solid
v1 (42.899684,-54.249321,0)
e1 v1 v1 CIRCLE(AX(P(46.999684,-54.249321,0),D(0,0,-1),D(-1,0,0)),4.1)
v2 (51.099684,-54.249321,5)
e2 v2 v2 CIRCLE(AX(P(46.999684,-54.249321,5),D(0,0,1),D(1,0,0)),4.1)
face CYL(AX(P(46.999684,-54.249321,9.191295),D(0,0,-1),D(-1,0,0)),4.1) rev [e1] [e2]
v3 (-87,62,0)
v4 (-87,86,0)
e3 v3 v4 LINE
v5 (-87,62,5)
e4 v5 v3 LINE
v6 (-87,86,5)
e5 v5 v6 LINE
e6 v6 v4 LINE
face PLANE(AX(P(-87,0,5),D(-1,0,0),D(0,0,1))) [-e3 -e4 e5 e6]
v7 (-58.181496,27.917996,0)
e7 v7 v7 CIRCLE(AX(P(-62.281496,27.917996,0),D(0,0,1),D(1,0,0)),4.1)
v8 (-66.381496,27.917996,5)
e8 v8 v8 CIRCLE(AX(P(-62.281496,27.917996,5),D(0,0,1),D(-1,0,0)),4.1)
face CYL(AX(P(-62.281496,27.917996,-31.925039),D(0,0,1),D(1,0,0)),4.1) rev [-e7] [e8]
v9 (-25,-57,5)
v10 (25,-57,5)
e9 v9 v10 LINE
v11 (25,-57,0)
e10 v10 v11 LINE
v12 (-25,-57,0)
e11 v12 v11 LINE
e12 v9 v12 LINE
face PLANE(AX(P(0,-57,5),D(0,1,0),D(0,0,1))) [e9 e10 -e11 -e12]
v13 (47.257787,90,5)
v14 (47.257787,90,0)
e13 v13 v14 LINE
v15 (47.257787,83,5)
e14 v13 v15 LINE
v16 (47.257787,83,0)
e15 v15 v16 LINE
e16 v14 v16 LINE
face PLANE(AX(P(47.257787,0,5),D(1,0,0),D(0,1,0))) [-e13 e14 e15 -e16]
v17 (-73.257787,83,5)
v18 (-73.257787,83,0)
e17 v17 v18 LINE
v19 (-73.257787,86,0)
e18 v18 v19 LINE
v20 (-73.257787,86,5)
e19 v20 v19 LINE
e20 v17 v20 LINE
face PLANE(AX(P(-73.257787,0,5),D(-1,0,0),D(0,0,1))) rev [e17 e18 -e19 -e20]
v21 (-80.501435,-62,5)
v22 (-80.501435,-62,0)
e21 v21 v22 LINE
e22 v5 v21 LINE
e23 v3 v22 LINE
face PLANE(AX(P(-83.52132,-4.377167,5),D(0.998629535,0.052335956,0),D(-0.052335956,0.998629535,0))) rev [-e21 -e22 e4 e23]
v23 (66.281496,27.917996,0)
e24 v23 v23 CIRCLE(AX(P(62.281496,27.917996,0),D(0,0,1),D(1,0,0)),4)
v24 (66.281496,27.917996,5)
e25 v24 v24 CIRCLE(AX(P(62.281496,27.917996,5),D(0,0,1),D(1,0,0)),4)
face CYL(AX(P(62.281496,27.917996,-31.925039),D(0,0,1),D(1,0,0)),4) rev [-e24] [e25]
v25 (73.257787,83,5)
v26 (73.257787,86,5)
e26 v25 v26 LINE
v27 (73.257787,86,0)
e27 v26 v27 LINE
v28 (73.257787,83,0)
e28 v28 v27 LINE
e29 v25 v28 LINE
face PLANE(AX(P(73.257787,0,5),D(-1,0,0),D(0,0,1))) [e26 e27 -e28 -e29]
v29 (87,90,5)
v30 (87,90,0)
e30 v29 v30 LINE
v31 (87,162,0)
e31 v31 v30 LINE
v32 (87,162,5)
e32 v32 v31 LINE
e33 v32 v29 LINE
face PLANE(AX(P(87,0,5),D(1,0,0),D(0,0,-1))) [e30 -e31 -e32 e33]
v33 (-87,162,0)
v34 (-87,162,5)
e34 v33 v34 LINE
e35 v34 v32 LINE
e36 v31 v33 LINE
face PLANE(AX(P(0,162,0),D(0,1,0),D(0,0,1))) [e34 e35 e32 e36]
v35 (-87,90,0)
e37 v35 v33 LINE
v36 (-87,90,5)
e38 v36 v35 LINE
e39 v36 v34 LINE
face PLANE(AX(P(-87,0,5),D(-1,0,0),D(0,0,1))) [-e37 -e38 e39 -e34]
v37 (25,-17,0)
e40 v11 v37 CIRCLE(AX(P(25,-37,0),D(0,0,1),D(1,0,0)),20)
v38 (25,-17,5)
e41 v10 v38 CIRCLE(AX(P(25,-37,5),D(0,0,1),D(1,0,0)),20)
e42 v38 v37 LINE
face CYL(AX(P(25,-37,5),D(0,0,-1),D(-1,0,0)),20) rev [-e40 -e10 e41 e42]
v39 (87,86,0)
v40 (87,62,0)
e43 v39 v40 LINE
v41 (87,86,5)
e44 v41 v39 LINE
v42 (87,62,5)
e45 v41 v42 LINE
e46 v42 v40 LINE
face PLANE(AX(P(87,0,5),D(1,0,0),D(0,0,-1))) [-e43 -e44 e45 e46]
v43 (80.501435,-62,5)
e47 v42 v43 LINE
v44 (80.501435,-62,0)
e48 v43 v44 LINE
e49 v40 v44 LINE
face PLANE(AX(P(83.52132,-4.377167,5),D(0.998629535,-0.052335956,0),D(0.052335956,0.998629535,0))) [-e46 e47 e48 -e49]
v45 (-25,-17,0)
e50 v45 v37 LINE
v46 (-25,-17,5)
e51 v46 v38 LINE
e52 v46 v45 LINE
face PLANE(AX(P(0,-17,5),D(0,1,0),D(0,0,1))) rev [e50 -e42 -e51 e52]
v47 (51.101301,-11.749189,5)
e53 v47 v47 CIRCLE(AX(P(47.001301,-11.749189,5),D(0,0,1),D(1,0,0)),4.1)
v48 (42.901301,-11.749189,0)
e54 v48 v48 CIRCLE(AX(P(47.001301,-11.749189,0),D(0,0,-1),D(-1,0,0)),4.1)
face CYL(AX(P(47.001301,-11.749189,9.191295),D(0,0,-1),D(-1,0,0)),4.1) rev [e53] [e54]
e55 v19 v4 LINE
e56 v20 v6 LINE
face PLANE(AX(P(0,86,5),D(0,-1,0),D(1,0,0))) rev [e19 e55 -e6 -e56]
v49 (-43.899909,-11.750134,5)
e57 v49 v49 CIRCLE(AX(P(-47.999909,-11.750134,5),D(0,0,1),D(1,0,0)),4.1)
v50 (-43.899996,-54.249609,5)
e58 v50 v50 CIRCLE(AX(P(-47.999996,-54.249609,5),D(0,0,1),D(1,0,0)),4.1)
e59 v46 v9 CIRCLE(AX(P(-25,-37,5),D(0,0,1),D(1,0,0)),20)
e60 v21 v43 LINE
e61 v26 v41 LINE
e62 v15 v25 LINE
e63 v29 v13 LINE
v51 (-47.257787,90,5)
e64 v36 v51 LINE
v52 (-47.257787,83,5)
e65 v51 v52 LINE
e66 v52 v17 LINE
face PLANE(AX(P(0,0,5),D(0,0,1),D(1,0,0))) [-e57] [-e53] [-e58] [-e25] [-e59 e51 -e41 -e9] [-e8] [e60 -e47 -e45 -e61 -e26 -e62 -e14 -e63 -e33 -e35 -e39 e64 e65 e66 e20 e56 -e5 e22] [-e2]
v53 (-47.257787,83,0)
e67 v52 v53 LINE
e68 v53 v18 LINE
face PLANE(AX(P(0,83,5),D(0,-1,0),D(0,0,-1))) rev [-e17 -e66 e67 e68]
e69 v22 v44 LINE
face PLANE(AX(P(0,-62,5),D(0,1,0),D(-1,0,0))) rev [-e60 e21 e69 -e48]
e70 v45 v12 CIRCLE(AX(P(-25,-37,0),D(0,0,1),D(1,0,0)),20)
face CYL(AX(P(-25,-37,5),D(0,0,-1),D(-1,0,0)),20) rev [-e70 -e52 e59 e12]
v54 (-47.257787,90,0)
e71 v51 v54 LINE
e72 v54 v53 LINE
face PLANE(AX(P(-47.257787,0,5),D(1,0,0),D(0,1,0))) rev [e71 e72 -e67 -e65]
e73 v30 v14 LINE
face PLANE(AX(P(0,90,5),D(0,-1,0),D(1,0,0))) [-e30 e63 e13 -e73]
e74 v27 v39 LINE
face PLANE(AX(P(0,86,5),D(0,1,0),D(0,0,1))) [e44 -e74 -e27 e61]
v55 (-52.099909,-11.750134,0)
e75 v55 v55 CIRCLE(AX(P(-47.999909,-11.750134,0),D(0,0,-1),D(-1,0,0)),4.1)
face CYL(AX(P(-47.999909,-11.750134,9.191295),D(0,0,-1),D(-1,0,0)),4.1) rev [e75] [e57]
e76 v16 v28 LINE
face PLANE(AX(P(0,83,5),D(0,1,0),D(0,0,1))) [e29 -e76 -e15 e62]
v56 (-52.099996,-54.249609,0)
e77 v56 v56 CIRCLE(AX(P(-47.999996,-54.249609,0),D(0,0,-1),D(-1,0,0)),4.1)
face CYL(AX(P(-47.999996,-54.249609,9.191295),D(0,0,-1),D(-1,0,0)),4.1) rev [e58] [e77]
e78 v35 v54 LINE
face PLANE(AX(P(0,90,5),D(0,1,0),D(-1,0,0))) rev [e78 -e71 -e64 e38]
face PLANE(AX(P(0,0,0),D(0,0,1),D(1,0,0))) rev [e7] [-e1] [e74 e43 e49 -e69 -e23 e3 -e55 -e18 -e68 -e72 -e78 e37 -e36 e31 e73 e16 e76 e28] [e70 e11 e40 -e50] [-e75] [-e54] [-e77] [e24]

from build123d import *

# Parameters (mm, degrees)
BOSS_EXTRUDE1_DEPTH     = 5
CHAMFER1_SIZE           = 2
BOSS_EXTRUDE4_START     = 80
BOSS_EXTRUDE4_OUTLINE_W = 26
BOSS_EXTRUDE4_OUTLINE_H = 5
BOSS_EXTRUDE4_DEPTH     = 3
SKETCH2_R               = 4.1
SKETCH2_R_2             = 4
CUT_EXTRUDE2_DEPTH      = 36.925038653
SKETCH4_R               = 4.1
CUT_EXTRUDE3_DEPTH      = 9.191294825
SKETCH5_W               = 174
SKETCH5_H               = 5
BOSS_EXTRUDE5_DEPTH     = 50


with BuildPart() as part:
    # Boss-Extrude1: read off the stored shape, not the designer's step
    # Boss-Extrude1 outline → Boss-Extrude1 (new body)
    with BuildSketch(Plane.XY):
        Polygon((-87, 62), (-80.501435369, -62), (80.501435369, -62), (87, 62), (87, 86), (73.257786703, 86), (73.257786703, 83), (47.257786703, 83), (47.257786703, 90), (87, 90), (87, 112), (-87, 112), (-87, 90), (-47.257786703, 90), (-47.257786703, 83), (-73.257786703, 83), (-73.257786703, 86), (-87, 86), align=None)
        with BuildLine():
            Line((-25, -17), (25, -17))
            ThreePointArc((25, -17), (45, -37), (25, -57))
            Line((25, -57), (-25, -57))
            ThreePointArc((-25, -57), (-45, -37), (-25, -17))
        make_face(mode=Mode.SUBTRACT)
    extrude(amount=BOSS_EXTRUDE1_DEPTH)

    # Chamfer1
    chamfer1_edges = [part.edges().sort_by_distance(p)[0] for p in [
        (60.257786703, 83, 5),
        (-60.257786703, 83, 5),
    ]]
    chamfer(chamfer1_edges, length=CHAMFER1_SIZE)

    # Boss-Extrude4: read off the stored shape, not the designer's step
    # Boss-Extrude4 outline → Boss-Extrude4 (add)
    with BuildSketch(Plane(origin=(0, 0, 0), x_dir=(1, 0, 0), z_dir=(0, 1, 0)).offset(BOSS_EXTRUDE4_START)):
        with Locations((60.257786703, -2.5)):
            Rectangle(BOSS_EXTRUDE4_OUTLINE_W, BOSS_EXTRUDE4_OUTLINE_H)
        with Locations((-60.257786703, -2.5)):
            Rectangle(BOSS_EXTRUDE4_OUTLINE_W, BOSS_EXTRUDE4_OUTLINE_H)
    extrude(amount=BOSS_EXTRUDE4_DEPTH)

    # Sketch2 → Cut-Extrude2 (cut)
    with BuildSketch(Plane.XY.offset(5)):
        with Locations((-62.28149578, 27.917996168)):
            Circle(SKETCH2_R)
        with Locations((62.28149578, 27.917996168)):
            Circle(SKETCH2_R_2)
    extrude(amount=-CUT_EXTRUDE2_DEPTH, mode=Mode.SUBTRACT)

    # Sketch4 → Cut-Extrude3 (cut)
    with BuildSketch(Plane(origin=(0, 0, 0), x_dir=(-1, 0, 0), z_dir=(0, 0, -1))):
        with Locations((-47.001300636, -11.749189401)):
            Circle(SKETCH4_R)
        with Locations((47.999909157, -11.750133675)):
            Circle(SKETCH4_R)
        with Locations((47.999996185, -54.249608673)):
            Circle(SKETCH4_R)
        with Locations((-46.999683563, -54.249320844)):
            Circle(SKETCH4_R)
    extrude(amount=-CUT_EXTRUDE3_DEPTH, mode=Mode.SUBTRACT)

    # Sketch5 → Boss-Extrude5 (add)
    with BuildSketch(Plane(origin=(0, 112, 0), x_dir=(1, 0, 0), z_dir=(0, 1, 0))):
        with Locations((0, -2.5)):
            Rectangle(SKETCH5_W, SKETCH5_H)
    extrude(amount=BOSS_EXTRUDE5_DEPTH)


solid = part.part
